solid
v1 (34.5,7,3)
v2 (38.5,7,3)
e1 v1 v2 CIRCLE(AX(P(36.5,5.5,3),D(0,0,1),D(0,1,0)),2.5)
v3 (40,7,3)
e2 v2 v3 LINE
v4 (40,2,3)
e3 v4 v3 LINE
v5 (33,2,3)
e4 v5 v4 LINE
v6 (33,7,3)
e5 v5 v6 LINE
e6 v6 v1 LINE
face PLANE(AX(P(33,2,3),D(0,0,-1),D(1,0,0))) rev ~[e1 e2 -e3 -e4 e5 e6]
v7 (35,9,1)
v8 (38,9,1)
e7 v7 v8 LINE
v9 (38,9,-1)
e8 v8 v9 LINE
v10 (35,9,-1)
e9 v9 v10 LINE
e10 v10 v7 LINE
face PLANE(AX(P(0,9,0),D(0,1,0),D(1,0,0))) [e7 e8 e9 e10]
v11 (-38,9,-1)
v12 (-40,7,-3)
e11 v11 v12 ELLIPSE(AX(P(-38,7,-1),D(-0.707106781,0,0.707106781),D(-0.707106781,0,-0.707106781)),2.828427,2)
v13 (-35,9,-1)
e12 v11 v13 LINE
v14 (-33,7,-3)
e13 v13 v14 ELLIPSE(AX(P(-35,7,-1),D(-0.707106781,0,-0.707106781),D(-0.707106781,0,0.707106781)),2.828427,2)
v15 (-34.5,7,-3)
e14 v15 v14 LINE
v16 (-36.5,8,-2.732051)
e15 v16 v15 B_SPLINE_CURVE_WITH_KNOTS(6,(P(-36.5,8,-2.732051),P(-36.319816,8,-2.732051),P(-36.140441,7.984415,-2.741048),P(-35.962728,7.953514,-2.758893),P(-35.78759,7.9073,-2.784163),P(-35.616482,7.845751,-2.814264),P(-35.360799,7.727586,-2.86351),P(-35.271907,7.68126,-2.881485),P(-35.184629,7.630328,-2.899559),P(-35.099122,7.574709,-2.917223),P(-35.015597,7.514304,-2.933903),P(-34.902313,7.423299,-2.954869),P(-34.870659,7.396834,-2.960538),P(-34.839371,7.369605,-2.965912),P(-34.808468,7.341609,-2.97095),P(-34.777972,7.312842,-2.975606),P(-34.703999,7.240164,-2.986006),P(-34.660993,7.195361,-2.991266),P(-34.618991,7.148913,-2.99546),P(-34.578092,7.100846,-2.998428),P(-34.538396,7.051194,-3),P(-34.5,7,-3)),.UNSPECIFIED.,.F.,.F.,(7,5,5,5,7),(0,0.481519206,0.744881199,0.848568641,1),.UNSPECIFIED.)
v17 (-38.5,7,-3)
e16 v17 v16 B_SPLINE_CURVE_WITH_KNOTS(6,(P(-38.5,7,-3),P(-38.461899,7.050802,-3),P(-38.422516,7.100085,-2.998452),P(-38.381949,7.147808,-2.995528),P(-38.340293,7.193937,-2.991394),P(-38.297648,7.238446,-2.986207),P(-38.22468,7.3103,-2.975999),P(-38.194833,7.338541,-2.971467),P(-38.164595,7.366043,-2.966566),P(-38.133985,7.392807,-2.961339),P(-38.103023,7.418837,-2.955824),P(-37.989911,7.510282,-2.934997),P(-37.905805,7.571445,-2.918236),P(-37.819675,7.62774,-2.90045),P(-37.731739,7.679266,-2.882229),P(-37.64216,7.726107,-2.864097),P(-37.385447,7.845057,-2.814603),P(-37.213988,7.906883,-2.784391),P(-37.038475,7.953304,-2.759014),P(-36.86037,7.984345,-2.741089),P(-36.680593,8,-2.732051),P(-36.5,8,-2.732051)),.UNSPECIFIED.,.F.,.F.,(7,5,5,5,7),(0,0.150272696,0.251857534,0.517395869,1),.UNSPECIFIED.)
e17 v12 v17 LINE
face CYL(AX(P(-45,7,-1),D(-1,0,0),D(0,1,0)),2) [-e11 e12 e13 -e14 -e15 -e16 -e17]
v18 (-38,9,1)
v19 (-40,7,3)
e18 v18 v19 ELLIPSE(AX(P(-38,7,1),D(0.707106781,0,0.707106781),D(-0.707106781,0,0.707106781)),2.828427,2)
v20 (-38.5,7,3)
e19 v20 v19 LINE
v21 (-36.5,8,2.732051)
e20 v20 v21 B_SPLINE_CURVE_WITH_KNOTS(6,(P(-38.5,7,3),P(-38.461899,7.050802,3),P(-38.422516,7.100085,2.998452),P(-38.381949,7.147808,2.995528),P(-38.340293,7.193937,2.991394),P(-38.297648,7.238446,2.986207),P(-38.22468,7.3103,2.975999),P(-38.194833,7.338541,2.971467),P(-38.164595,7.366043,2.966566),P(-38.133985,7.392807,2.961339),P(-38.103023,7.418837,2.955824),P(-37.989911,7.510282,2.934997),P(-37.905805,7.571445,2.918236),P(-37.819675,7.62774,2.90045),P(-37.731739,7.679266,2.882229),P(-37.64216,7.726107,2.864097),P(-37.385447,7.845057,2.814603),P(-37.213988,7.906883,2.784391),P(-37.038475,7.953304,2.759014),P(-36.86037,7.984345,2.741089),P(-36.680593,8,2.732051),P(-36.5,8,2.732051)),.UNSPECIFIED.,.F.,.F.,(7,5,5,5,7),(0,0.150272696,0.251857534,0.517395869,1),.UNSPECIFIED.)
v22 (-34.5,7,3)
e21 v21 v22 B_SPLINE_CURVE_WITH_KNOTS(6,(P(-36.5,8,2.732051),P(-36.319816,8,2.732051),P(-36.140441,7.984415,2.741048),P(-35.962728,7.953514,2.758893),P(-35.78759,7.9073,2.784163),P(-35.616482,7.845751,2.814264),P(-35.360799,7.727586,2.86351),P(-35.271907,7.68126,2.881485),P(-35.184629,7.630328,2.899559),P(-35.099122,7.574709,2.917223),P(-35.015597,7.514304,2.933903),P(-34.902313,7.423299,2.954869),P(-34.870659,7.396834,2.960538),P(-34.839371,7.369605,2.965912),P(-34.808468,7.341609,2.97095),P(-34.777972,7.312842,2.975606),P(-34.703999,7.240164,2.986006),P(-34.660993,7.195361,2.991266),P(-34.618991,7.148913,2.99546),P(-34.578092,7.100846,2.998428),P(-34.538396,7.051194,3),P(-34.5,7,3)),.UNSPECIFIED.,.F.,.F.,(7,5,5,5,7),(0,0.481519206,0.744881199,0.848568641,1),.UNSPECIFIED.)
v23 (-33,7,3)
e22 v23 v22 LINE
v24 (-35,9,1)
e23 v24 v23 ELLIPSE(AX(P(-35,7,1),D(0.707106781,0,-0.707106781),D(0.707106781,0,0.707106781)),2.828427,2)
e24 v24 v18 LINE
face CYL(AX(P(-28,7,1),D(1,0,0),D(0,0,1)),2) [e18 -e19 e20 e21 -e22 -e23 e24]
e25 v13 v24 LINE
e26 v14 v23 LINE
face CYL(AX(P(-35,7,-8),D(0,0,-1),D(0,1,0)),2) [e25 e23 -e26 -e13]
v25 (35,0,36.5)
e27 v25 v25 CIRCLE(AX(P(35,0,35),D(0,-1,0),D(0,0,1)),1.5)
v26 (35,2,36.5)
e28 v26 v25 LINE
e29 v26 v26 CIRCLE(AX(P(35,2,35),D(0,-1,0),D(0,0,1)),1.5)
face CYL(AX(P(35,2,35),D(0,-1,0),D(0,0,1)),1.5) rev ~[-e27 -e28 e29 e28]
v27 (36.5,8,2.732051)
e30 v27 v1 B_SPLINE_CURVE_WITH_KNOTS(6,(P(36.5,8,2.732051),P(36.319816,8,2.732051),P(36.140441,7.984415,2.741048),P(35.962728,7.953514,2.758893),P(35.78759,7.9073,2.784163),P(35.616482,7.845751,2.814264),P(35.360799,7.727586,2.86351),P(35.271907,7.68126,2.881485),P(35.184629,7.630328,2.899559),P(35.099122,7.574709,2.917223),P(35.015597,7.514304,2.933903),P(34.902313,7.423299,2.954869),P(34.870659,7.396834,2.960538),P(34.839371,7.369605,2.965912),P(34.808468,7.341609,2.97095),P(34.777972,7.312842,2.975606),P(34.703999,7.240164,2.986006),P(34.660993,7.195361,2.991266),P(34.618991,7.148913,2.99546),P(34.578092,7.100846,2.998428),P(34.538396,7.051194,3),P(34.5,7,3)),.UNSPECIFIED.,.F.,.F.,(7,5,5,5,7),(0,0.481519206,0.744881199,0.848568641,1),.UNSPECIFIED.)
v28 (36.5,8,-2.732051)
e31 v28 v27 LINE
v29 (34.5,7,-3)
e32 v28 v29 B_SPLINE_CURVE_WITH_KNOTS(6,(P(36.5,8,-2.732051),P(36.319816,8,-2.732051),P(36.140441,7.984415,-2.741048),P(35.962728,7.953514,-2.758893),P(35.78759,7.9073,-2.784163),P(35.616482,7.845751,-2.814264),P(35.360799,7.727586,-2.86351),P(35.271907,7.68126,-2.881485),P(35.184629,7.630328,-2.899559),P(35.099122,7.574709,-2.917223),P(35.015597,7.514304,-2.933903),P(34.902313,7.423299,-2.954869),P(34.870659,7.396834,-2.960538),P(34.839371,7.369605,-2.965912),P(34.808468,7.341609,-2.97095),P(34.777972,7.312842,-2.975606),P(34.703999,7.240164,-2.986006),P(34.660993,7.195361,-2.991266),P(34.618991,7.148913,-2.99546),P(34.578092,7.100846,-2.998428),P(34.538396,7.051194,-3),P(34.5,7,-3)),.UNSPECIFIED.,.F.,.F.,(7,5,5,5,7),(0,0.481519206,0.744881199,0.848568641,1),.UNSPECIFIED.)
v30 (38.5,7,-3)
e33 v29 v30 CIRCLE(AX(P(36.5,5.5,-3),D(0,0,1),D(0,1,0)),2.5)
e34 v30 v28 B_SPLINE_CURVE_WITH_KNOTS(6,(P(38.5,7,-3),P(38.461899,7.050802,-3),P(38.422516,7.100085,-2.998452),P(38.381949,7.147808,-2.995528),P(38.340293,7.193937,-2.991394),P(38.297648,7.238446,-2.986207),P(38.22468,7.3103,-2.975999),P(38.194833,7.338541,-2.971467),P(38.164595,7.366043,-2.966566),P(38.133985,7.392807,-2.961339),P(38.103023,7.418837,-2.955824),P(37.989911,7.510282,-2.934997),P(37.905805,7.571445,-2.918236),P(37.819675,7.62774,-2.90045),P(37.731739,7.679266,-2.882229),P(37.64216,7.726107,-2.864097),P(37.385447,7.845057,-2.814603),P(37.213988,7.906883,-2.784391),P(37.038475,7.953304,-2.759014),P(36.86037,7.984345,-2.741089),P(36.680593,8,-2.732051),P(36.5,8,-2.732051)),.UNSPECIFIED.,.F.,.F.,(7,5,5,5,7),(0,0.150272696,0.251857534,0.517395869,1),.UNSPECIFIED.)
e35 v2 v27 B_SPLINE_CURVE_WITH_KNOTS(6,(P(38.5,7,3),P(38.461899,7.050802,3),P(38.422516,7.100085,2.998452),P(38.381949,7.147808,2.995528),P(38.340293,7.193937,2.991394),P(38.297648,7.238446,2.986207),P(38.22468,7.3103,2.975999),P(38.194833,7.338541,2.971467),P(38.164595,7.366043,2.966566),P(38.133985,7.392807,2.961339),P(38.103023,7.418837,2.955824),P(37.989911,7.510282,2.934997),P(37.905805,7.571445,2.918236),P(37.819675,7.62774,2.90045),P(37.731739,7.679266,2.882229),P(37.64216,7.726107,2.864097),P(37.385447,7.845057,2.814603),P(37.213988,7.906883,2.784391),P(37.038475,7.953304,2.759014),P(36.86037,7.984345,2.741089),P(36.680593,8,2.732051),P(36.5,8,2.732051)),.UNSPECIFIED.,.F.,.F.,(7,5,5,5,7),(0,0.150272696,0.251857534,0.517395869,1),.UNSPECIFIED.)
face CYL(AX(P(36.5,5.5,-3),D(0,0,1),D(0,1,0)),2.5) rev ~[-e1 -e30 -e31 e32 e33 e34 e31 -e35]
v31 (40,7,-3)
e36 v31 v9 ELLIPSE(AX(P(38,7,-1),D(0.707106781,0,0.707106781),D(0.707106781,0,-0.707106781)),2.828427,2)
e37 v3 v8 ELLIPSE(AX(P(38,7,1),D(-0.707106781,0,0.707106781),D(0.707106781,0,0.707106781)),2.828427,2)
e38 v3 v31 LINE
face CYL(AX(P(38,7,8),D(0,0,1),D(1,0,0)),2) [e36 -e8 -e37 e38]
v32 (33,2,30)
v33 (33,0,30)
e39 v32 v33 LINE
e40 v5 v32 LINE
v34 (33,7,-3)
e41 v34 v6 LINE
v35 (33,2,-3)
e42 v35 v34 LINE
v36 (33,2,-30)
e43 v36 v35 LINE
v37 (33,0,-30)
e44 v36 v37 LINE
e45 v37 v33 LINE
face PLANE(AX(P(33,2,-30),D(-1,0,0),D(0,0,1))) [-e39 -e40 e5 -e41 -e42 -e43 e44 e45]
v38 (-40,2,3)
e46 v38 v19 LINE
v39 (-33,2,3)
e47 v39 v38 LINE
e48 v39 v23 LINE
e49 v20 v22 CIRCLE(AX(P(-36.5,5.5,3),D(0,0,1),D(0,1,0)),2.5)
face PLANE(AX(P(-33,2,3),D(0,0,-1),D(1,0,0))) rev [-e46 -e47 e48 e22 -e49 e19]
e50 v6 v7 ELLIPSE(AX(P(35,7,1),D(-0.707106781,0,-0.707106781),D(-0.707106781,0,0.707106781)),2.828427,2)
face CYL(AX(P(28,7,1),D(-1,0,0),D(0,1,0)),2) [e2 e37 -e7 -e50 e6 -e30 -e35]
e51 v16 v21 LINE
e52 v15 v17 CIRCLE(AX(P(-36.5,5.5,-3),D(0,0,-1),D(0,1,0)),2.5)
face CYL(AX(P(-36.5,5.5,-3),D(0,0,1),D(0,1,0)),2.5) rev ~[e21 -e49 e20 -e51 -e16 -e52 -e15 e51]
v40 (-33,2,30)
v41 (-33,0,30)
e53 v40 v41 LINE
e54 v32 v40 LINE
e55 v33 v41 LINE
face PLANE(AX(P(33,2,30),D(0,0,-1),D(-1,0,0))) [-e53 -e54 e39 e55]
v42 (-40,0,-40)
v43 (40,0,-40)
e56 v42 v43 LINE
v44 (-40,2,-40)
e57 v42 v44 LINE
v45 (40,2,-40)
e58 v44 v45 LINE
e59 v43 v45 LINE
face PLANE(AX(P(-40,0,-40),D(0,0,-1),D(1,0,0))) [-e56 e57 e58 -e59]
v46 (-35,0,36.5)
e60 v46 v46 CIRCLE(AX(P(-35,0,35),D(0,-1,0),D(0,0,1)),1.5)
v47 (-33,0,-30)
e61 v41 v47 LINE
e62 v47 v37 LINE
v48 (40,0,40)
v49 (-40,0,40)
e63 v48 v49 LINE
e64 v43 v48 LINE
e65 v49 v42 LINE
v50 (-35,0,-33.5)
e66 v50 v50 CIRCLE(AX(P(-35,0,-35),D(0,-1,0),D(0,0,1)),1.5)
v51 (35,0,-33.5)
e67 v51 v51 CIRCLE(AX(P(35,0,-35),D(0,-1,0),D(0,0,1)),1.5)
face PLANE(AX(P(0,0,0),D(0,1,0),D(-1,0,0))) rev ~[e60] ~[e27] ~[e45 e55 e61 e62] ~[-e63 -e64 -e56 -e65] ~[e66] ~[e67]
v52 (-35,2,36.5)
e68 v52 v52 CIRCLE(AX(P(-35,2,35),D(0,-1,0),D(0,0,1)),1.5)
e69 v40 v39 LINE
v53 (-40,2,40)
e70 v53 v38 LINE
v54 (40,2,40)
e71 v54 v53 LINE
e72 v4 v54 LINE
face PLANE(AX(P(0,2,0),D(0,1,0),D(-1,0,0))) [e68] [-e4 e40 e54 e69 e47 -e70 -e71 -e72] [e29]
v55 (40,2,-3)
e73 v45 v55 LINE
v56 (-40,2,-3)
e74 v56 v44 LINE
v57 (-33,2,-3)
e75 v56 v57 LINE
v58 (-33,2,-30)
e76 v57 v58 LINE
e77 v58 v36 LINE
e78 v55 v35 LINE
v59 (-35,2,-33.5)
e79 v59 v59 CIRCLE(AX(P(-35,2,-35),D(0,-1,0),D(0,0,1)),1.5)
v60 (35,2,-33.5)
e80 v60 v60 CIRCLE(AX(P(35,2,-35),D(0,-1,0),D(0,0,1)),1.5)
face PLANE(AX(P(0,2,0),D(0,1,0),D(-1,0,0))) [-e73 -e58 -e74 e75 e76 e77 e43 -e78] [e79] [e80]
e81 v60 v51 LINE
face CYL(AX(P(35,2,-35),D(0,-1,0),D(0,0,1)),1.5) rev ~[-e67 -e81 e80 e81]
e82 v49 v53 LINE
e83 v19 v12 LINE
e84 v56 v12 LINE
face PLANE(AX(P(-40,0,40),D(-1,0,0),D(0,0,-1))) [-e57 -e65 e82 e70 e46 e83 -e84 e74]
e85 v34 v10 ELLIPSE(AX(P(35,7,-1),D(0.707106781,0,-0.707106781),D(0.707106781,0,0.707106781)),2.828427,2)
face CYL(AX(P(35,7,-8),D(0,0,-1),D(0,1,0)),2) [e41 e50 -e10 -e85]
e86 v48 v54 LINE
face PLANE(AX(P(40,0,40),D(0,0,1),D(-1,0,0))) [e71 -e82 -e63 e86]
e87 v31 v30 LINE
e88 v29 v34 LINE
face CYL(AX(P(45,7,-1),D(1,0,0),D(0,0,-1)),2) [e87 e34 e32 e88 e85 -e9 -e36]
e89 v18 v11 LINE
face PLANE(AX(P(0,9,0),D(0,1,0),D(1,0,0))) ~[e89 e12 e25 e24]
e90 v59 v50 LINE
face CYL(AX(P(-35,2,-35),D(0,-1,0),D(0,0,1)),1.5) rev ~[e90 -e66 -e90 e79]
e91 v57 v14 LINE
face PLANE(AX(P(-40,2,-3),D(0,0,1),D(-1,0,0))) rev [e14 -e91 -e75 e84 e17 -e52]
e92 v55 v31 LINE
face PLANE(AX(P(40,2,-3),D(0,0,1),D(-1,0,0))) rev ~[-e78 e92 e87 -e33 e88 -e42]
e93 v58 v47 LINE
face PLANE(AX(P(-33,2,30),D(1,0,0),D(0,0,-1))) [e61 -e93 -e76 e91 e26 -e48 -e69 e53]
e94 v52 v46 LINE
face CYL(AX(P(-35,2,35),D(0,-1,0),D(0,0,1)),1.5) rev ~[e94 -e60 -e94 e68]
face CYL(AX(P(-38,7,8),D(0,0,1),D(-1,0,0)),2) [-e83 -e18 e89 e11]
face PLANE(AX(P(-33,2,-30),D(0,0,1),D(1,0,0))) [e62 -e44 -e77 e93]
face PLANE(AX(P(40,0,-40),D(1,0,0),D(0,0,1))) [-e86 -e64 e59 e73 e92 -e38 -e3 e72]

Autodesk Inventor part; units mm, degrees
ref_plane "YZ Plane" through (0, 0, 0) normal (1, 0, 0) x (0, 1, 0)
ref_plane "XZ Plane" through (0, 0, 0) normal (0, 1, 0) x (-1, 0, 0)
ref_plane "XY Plane" through (0, 0, 0) normal (0, 0, 1) x (1, 0, 0)
sketch "Esquisse1" plane through (0, 0, 0) normal (0, 1, 0) x (-1, 0, 0)
  line L0 (-40, 40) -> (40, 40)
  line L1 (40, 40) -> (40, -40)
  line L2 (40, -40) -> (-40, -40)
  line L3 (-40, -40) -> (-40, 40)
  line L4 (-40, 40) -> (40, -40) construction
  line L5 (40, 40) -> (-40, -40) construction
  point P0 (0, 0)
  dimension "d0" = 80
extrude "Extrusion1" add sketch "Esquisse1" along normal blind 2
sketch "Esquisse2" plane through (0, 2, 0) normal (0, 1, 0) x (1, 0, 0)
  point P0 (0, 0)
sketch "Esquisse3" plane through (0, 2, 0) normal (0, 1, 0) x (1, 0, 0)
  line L0 (33, -30) -> (-33, -30)
  line L1 (-33, -30) -> (-33, 30)
  line L2 (-33, 30) -> (33, 30)
  line L3 (33, 30) -> (33, -30)
  line L4 (33, -30) -> (-33, 30) construction
  line L5 (-33, -30) -> (33, 30) construction
  point P0 (0, 0)
  dimension "d3" = 66
  dimension "d4" = 60
extrude "Extrusion2" cut sketch "Esquisse3" against normal blind 10
sketch "Esquisse10" plane through (0, 2, 0) normal (0, 1, 0) x (1, 0, 0)
  line L0 (35, 35) -> (-35, 35)
  line L1 (-35, 35) -> (-35, -35)
  line L2 (-35, -35) -> (35, -35)
  line L3 (35, -35) -> (35, 35)
  line L4 (35, 35) -> (-35, -35) construction
  line L5 (-35, 35) -> (35, -35) construction
  line L6 (-40, 40) -> (-40, -40) projected
  line L7 (-40, -40) -> (40, -40) projected
  point P0 (0, 0)
  point P1 (-40, -5)
  dimension "d23" = 5
  dimension "d24" = 5
hole "Perçage1" at (35, 2, 35) at (-35, 2, 35) at (-35, 2, -35) at (35, 2, -35) direction (0, -1, 0) diameter 3 depth 66.675 tip angle 118
sketch "Esquisse11" plane through (0, 2, 0) normal (0, 1, 0) x (1, 0, 0)
  line L0 (40, -40) -> (40, 40) projected
  line L1 (33, 30) -> (33, -30) projected
  line L2 (40, 3) -> (33, 3)
  line L3 (33, 3) -> (33, -3)
  line L4 (33, -3) -> (40, -3)
  line L5 (40, -3) -> (40, 3)
  point P0 (0, 0)
  dimension "d37" = 3
  dimension "d38" = 3
extrude "Extrusion9" add sketch "Esquisse11" along normal blind 7
sketch "Esquisse12" plane through (40, 2, -3) normal (0, 0, -1) x (-1, 0, 0)
  line L0 (7, 0) -> (0, 0) projected
  line L1 (0, 0) -> (7, 6.8816)
  line L2 (0, 0) -> (0, 7) projected
  line L3 (7, 0) -> (0, 7)
  point P0 (40, -2)
  point P1 (3.5, 3.5)
hole "Perçage2" at (36.5, 5.5, -3) direction (0, 0, 1) diameter 5 depth 66.675 tip angle 118
fillet "Congé1" radius 2 4 edges at (36.5, 9, -3) (40, 9, 0) (36.5, 9, 3) (33, 9, 0)
ref_plane "Plan de construction1" through (0, 0, -40) normal (-1, 0, 0) x (0, 0, 1)
mirror "Symétrie1" about plane through (0, 0, -40) normal (-1, 0, 0) of "Extrusion9", "Perçage2", "Congé1"
